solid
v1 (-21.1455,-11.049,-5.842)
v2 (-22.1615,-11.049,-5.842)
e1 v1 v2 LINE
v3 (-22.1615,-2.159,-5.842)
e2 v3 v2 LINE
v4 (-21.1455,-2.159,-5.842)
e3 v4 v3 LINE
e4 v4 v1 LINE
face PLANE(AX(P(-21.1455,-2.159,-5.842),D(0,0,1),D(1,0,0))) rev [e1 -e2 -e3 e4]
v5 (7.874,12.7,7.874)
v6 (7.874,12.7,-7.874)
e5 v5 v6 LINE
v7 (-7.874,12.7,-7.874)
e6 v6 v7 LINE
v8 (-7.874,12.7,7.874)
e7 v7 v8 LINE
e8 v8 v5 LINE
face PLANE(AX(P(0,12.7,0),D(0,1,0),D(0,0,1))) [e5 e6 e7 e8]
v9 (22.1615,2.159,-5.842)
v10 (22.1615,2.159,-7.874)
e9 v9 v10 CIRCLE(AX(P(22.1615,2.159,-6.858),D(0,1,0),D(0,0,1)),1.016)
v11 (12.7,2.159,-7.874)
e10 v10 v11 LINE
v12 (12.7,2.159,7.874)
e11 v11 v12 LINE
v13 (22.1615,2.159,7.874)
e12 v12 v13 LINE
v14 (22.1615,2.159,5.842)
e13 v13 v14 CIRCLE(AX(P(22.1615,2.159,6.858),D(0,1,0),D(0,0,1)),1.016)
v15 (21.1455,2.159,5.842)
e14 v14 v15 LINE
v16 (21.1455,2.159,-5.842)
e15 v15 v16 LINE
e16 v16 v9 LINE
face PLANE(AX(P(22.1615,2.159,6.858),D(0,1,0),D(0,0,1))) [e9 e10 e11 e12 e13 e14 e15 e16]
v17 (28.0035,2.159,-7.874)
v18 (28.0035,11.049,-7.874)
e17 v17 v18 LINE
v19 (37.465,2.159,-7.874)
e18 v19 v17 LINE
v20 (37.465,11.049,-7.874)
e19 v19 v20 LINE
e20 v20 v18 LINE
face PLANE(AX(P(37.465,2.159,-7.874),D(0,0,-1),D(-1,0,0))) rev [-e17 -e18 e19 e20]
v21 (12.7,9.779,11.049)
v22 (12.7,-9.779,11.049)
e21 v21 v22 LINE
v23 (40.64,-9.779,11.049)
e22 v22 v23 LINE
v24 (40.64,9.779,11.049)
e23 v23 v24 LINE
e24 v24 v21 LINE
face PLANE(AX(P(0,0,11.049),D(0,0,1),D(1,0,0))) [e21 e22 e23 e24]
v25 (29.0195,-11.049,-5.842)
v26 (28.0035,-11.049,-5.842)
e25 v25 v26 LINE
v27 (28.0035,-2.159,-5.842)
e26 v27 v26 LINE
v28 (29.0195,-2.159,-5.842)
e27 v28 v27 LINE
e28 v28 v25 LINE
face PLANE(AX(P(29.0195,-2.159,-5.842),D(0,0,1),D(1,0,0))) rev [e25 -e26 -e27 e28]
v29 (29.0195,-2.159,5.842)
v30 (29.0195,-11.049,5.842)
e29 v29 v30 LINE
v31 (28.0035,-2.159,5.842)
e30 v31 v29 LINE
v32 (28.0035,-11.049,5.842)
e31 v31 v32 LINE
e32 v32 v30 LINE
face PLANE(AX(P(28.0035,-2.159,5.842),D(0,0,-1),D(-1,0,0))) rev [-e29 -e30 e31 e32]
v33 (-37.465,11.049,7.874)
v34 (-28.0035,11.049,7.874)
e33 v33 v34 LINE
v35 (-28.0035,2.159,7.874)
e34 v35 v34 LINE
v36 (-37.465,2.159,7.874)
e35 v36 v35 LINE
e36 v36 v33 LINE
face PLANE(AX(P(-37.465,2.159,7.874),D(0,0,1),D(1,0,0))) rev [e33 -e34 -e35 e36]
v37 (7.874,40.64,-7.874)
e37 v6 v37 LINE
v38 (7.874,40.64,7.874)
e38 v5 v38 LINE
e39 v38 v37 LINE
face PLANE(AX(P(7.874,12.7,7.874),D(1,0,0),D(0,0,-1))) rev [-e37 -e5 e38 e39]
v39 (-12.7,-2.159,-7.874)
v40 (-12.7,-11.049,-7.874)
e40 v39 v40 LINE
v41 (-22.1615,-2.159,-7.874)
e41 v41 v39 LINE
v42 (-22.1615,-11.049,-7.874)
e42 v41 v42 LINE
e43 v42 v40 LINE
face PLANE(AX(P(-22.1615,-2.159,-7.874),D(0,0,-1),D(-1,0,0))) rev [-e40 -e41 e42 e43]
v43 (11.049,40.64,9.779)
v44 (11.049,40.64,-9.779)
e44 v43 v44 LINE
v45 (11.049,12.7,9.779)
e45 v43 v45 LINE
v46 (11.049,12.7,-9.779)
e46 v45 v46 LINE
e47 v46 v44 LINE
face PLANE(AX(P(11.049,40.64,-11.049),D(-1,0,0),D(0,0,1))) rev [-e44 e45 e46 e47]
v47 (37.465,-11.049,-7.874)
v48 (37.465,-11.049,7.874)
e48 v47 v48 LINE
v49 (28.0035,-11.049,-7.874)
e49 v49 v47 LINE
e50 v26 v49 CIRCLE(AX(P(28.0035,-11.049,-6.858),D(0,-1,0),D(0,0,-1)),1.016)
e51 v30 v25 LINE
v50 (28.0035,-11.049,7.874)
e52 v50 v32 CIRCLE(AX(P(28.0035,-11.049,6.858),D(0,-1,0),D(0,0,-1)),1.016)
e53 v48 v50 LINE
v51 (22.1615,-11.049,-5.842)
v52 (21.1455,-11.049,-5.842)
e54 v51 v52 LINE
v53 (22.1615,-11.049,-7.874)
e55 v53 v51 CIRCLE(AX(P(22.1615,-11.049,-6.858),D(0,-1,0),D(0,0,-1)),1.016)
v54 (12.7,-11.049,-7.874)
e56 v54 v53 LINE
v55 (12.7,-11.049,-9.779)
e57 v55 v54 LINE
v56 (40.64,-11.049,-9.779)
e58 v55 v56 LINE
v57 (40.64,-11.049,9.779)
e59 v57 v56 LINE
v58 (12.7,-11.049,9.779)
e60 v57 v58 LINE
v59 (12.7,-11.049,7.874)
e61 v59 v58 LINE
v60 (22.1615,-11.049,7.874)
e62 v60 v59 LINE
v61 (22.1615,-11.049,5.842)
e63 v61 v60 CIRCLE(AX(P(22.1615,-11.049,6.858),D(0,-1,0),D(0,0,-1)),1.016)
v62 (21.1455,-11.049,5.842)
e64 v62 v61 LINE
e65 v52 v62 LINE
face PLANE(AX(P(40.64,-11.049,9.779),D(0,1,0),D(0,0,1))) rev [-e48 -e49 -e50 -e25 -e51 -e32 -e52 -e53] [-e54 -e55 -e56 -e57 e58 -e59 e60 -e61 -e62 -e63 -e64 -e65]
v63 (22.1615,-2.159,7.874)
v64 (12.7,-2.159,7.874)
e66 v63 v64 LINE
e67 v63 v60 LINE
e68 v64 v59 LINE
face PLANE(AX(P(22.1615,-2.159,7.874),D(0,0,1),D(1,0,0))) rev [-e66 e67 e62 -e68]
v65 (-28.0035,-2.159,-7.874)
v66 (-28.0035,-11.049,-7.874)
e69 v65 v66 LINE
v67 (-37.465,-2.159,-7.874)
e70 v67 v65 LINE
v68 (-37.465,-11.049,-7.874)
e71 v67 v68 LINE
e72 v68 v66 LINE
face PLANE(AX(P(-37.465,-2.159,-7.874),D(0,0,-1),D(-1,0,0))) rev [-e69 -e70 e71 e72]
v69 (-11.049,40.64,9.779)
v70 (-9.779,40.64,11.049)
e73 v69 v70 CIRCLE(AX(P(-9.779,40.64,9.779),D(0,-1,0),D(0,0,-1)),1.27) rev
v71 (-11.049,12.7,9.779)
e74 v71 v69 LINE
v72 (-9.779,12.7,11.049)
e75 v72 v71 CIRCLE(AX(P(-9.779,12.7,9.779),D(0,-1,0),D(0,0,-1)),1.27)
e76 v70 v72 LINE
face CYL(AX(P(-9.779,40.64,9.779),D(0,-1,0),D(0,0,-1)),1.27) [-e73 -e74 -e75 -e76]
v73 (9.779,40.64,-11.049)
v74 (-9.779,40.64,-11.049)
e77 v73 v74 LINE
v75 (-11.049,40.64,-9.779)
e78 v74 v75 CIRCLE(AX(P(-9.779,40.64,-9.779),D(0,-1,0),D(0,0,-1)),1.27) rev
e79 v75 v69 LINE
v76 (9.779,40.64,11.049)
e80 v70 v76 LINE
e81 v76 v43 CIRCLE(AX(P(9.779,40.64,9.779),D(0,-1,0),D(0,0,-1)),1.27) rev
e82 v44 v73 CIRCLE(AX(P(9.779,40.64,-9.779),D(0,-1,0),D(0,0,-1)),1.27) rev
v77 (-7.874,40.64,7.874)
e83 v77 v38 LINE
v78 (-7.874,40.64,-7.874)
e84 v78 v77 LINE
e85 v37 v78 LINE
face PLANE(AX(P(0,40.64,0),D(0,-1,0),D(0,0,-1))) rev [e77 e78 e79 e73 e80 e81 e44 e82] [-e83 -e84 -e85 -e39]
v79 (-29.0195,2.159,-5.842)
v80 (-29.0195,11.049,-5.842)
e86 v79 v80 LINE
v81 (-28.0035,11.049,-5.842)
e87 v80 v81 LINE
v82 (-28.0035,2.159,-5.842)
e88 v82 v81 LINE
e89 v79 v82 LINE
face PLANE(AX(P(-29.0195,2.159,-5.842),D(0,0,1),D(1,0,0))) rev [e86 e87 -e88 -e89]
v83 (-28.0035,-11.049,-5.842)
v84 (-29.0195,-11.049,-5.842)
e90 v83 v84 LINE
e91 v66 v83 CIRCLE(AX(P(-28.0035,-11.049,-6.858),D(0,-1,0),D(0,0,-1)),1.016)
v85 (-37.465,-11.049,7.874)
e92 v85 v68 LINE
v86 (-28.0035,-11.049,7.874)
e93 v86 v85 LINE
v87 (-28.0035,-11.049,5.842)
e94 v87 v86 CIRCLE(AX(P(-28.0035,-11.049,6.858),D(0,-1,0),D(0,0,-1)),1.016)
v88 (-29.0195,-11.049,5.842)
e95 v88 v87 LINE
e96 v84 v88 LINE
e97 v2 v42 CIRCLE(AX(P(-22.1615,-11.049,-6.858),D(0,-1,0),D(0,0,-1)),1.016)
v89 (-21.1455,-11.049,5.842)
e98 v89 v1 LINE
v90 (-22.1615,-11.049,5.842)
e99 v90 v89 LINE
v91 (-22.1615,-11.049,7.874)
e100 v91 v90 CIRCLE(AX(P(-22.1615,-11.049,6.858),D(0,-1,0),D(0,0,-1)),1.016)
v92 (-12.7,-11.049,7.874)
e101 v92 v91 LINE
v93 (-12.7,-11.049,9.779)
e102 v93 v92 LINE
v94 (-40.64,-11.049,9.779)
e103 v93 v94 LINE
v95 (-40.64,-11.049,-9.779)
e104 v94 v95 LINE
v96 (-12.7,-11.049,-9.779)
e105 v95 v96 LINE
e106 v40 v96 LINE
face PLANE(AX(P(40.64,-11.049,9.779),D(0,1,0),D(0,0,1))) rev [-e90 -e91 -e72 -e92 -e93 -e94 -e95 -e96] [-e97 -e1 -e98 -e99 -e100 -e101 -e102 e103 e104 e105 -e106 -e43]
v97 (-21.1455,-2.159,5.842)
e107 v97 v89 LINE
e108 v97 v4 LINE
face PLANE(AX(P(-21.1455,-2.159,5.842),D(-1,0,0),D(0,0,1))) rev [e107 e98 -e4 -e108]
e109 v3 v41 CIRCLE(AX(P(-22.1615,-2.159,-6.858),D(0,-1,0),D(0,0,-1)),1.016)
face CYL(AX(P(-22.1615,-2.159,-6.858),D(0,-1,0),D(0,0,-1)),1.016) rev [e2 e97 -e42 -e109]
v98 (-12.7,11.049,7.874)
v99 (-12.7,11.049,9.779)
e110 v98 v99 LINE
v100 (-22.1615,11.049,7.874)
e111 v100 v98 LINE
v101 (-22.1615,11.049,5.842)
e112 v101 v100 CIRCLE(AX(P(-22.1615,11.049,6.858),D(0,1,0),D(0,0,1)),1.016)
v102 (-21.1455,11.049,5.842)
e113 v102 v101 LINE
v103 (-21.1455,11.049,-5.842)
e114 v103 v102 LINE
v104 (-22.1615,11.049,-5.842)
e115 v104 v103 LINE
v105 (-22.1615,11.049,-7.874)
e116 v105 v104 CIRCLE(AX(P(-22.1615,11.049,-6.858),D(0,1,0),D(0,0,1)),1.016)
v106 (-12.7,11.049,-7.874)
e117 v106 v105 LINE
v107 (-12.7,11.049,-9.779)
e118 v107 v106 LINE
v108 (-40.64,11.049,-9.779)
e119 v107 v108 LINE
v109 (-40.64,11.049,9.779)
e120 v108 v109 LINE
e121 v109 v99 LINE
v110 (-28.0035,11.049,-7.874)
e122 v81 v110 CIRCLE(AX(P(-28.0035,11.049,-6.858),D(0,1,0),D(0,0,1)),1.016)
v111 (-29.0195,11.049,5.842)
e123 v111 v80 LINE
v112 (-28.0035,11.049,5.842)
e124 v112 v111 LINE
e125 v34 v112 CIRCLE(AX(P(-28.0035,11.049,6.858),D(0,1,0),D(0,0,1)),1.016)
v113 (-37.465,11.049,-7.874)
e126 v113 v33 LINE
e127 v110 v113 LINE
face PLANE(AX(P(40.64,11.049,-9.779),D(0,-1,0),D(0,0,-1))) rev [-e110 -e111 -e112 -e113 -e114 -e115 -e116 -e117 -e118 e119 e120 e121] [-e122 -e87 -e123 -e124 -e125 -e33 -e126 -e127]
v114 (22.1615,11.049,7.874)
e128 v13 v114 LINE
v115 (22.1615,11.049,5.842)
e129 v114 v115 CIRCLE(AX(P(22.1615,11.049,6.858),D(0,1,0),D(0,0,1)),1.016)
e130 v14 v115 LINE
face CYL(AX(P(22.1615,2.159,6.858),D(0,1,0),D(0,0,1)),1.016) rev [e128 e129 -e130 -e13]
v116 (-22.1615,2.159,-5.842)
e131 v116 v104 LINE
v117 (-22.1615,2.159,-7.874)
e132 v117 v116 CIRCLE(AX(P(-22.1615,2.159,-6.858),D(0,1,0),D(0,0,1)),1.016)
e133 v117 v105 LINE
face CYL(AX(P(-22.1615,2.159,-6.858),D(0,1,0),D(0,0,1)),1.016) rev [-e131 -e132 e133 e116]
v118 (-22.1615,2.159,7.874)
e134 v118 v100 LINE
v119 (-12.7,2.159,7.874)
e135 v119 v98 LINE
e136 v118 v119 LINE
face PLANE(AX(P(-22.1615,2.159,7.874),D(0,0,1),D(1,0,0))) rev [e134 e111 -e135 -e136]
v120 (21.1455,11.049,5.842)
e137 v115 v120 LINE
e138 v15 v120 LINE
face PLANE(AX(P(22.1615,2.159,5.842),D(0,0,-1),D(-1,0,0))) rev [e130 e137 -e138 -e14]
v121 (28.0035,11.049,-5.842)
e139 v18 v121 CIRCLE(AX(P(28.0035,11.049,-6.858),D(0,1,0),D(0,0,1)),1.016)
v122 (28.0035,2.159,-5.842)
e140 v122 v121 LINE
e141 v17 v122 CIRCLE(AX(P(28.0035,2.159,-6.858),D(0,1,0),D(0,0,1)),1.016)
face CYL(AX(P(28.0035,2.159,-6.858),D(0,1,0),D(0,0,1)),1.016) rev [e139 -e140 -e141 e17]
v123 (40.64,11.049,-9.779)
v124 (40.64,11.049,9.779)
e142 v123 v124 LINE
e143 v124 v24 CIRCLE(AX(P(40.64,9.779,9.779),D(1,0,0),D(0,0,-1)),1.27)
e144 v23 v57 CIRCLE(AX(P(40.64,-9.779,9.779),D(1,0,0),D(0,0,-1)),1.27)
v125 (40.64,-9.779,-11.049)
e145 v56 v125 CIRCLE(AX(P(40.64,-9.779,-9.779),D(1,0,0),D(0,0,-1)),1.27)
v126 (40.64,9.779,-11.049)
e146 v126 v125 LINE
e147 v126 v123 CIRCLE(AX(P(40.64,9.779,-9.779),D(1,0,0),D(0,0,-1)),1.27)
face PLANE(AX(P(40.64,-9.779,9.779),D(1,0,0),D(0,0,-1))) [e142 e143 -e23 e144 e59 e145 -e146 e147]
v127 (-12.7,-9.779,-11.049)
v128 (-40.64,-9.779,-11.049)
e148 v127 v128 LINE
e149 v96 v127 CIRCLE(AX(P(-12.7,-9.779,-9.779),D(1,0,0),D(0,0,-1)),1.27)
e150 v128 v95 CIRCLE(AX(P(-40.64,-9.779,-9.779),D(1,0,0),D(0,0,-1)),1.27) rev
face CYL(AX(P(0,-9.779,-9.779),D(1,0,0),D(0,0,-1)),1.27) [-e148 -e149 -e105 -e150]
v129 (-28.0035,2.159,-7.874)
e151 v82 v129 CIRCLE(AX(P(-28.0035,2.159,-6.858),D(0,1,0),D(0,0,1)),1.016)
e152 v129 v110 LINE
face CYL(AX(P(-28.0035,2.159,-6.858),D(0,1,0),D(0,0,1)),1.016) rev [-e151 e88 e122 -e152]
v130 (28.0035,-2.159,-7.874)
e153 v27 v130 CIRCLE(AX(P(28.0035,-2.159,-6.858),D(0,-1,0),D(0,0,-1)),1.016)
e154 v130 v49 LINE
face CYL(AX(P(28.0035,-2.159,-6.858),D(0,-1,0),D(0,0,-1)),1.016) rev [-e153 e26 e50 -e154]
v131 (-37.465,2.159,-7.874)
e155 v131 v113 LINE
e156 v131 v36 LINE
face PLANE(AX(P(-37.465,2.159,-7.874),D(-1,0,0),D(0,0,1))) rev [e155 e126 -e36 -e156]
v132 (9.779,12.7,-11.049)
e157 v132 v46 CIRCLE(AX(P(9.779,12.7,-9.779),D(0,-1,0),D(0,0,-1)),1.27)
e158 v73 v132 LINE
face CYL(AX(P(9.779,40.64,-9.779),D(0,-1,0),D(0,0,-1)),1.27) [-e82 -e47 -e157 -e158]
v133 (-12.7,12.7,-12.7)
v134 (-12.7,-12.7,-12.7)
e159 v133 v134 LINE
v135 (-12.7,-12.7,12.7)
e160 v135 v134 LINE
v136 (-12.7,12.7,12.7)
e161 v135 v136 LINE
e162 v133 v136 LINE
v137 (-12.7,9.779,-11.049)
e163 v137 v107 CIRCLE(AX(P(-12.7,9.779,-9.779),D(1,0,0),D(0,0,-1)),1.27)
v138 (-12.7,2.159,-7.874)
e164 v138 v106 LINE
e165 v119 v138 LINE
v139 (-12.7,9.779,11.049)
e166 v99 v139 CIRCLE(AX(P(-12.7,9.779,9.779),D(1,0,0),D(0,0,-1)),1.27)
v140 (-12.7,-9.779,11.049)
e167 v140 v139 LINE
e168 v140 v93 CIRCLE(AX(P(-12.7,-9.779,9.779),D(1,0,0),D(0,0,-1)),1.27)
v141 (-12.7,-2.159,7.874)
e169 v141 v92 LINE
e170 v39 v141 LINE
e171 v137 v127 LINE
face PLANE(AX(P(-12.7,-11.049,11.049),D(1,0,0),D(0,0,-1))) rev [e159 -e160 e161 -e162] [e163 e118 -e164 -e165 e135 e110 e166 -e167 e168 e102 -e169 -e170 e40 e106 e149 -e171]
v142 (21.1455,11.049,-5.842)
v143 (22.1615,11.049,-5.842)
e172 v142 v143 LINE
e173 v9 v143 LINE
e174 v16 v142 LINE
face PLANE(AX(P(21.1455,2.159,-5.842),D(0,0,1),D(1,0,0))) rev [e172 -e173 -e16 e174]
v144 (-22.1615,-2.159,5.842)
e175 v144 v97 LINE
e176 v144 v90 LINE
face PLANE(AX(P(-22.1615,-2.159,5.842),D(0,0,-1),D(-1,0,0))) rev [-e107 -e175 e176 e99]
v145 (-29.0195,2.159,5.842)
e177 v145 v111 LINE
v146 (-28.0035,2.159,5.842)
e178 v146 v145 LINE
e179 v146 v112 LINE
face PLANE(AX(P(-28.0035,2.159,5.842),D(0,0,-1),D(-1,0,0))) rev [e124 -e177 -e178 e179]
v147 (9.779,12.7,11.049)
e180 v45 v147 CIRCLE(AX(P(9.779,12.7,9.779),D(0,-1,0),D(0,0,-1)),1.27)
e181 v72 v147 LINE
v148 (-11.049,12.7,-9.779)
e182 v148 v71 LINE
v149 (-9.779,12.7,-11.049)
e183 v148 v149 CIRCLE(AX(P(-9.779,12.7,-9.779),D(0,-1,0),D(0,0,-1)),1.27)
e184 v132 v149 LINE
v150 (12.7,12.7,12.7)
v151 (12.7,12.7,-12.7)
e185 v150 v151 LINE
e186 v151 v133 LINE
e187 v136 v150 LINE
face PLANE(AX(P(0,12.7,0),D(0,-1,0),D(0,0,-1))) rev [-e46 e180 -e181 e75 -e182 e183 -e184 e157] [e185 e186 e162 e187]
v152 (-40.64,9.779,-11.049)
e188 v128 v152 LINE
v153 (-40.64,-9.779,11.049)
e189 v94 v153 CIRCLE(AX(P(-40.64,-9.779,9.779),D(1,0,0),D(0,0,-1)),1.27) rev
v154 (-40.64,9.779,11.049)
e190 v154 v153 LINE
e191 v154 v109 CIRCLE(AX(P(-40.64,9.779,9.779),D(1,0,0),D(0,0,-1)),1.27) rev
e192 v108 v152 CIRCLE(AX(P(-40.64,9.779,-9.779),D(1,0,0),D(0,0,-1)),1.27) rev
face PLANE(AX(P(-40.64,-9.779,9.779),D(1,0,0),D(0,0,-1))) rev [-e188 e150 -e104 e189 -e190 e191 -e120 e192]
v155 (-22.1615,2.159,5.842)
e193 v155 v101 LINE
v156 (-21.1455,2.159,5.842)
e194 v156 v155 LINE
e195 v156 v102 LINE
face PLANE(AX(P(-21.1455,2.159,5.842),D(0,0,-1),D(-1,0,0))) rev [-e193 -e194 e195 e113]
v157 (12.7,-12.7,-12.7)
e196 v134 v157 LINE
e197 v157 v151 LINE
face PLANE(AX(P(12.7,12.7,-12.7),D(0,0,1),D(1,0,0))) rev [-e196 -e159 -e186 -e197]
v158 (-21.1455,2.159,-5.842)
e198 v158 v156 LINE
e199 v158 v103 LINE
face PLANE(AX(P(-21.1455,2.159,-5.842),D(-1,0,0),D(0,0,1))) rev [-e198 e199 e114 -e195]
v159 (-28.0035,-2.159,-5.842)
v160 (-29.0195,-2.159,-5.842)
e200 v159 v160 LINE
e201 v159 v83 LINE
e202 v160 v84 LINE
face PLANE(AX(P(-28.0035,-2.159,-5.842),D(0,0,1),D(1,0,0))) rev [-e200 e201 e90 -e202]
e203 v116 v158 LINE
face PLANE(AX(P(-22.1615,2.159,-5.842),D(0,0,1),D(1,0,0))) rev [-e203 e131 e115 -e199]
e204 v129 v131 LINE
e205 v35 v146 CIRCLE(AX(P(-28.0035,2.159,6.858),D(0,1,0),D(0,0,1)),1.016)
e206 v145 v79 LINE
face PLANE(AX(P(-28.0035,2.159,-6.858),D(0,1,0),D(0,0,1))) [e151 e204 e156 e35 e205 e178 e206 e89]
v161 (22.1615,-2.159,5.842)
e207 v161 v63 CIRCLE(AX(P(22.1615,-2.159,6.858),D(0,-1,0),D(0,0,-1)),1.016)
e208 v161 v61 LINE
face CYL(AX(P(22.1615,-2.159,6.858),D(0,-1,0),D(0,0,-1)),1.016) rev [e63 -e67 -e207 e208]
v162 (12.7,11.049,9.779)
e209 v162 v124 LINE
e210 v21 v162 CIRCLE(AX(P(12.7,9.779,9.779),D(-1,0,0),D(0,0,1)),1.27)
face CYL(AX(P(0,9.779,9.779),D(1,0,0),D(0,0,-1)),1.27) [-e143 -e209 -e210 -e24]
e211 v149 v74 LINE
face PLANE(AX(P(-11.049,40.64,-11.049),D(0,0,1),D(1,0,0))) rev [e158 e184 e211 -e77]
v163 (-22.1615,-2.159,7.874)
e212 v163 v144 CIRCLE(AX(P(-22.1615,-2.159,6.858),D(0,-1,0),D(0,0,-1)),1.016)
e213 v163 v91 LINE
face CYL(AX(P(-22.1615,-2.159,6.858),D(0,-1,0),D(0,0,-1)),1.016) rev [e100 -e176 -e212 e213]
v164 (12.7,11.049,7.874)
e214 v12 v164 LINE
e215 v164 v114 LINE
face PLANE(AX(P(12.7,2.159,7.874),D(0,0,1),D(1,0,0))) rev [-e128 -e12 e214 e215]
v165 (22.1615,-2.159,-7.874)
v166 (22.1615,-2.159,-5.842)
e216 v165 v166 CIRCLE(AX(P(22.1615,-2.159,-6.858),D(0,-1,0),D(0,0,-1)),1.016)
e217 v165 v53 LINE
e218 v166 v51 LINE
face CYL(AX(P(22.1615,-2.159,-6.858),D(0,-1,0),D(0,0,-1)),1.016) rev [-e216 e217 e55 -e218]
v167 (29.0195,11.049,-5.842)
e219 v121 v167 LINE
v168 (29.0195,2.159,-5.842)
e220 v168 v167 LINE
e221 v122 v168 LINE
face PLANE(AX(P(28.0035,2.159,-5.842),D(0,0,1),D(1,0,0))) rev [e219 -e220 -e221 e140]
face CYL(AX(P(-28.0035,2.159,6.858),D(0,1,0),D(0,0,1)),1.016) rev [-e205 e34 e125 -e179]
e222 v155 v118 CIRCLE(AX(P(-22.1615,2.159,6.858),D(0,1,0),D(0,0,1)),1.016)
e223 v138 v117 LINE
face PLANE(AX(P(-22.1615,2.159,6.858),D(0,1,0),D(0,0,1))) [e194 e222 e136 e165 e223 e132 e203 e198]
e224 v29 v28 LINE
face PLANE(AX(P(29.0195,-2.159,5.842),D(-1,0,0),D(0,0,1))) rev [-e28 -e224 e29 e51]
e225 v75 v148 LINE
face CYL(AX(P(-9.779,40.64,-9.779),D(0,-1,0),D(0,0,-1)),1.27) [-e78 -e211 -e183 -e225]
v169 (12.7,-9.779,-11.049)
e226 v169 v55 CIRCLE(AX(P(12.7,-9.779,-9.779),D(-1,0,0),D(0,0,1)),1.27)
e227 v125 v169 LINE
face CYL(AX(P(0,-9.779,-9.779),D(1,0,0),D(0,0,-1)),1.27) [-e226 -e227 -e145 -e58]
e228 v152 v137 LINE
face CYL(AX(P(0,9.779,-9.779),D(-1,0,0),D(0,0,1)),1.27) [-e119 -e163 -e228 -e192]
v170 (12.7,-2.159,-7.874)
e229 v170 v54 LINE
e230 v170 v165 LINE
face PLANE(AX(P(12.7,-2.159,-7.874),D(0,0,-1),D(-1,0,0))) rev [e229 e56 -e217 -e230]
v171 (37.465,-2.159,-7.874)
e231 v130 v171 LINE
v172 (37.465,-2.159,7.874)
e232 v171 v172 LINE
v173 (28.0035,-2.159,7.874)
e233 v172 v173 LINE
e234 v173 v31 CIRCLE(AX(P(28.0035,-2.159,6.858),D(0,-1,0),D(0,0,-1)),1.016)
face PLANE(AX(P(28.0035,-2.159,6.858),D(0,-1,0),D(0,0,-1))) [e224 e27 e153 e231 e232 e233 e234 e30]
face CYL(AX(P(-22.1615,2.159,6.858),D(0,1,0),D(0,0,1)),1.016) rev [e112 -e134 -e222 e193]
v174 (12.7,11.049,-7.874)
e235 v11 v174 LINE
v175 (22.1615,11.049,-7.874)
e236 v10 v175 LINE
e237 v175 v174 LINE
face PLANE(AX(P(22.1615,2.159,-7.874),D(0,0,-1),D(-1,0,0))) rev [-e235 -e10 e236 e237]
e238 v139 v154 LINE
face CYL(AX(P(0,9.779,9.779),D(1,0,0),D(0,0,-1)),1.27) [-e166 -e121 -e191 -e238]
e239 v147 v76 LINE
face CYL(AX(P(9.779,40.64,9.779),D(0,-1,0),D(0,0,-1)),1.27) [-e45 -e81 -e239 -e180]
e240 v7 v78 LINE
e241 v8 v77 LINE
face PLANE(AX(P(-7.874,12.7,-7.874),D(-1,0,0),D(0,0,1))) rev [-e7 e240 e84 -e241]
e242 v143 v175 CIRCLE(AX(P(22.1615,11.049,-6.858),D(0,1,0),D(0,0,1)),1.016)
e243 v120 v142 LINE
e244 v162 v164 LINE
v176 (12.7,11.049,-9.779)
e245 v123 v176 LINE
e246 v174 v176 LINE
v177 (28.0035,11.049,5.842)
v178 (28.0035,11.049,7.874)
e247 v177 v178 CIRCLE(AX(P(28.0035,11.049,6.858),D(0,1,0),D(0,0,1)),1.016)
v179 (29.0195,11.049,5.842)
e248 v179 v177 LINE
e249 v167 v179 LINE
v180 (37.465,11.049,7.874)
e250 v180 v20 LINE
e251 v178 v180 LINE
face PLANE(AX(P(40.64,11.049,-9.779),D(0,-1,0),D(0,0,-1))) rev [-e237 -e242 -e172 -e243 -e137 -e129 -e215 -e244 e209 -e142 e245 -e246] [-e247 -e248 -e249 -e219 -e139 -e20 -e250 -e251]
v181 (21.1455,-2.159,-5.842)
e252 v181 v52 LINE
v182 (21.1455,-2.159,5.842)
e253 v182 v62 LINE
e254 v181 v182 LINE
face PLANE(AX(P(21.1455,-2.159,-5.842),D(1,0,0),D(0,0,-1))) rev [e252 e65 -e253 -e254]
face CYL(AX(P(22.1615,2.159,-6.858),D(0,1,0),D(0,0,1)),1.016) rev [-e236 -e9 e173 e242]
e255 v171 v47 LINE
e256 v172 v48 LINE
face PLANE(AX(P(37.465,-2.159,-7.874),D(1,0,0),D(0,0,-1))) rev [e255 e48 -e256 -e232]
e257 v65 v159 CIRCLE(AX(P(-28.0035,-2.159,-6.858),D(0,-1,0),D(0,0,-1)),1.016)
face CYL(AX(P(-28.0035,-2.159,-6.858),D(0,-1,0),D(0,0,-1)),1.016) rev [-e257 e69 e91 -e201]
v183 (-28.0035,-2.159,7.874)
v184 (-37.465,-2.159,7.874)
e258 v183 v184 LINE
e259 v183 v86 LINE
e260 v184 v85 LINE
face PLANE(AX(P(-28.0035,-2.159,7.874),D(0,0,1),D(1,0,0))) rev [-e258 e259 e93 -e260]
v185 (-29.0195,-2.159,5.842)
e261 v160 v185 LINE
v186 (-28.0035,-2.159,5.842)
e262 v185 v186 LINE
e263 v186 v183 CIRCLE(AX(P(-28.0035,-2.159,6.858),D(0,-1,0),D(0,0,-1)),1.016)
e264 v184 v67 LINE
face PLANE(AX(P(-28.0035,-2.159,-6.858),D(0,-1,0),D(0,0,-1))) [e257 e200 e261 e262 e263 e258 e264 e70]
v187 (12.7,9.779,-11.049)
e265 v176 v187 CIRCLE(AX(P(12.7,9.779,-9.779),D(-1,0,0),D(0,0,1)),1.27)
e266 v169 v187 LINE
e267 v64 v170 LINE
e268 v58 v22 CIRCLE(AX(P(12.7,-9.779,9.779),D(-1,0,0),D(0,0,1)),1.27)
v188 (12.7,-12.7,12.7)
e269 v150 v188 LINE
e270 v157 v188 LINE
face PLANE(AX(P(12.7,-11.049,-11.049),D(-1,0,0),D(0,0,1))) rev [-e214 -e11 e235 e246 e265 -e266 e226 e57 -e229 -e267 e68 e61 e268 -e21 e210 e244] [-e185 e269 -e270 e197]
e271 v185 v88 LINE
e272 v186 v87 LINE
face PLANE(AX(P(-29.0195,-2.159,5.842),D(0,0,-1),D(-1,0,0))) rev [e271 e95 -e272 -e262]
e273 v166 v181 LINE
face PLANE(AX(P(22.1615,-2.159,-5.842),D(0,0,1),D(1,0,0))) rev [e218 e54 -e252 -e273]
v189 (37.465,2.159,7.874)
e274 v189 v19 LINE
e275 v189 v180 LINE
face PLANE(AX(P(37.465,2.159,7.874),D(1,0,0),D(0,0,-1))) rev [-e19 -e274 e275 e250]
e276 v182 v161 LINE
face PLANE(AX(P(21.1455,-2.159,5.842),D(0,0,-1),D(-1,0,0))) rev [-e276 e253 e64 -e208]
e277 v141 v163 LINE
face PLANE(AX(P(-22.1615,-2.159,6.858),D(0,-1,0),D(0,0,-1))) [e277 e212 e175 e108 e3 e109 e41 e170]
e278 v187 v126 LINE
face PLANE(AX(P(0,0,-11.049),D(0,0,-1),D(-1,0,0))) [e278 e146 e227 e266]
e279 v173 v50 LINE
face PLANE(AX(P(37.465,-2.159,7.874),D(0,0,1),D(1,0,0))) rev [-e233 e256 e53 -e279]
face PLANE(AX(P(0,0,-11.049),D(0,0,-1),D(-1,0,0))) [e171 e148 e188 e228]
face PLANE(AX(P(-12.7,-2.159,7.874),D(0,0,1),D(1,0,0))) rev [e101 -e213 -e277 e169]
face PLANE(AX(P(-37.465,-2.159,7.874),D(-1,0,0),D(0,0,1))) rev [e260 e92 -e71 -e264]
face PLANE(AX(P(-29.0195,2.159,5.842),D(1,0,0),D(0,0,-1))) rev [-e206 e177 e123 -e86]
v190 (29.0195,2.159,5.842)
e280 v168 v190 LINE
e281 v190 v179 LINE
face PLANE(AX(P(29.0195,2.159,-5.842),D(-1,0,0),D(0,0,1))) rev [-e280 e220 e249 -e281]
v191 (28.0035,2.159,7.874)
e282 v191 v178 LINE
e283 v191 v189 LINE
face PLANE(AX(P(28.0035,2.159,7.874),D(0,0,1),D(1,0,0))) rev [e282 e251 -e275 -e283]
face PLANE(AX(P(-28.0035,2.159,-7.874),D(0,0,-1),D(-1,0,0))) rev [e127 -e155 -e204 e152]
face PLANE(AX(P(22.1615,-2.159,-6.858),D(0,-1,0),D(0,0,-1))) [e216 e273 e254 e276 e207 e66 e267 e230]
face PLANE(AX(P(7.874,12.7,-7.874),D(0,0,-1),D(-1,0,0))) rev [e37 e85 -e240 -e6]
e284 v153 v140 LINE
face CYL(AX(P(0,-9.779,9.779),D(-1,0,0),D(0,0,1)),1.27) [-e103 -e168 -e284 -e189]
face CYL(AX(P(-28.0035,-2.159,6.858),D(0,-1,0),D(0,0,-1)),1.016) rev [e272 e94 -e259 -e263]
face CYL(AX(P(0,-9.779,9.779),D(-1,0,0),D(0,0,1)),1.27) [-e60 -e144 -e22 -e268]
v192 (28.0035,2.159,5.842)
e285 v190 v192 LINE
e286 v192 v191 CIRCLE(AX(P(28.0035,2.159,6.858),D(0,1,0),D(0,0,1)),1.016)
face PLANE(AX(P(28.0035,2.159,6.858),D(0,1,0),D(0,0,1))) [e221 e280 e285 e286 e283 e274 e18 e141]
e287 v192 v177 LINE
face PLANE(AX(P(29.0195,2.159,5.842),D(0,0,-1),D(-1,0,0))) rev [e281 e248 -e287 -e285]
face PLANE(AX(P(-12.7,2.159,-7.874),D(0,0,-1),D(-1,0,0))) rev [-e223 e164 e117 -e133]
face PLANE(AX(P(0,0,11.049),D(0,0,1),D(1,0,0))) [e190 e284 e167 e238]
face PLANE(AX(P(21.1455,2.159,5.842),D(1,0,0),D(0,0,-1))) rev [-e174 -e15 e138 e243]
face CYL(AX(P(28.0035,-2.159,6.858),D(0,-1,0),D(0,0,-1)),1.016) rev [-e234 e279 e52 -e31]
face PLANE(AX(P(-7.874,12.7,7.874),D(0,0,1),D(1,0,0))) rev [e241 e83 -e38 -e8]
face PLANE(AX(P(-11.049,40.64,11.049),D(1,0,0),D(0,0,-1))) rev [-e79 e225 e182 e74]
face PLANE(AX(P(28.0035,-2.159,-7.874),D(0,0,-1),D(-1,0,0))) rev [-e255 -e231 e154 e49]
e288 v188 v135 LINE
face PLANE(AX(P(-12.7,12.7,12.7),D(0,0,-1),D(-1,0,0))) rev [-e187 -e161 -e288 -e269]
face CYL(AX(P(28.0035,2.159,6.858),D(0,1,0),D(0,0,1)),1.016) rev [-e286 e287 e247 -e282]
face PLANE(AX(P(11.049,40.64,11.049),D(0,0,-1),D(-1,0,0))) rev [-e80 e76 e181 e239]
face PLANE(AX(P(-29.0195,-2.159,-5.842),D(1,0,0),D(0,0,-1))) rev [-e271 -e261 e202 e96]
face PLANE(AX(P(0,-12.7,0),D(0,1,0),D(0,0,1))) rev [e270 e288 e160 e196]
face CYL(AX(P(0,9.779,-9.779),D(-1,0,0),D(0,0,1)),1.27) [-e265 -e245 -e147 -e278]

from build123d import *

# Parameters (mm, degrees)
CUT_EXTRUDE1_START       = -25.4
CUT_EXTRUDE1_OUTLINE_W   = 81.28
CUT_EXTRUDE1_OUTLINE_H   = 22.098
CUT_EXTRUDE1_DEPTH       = 23.749
CUT_EXTRUDE1_START_2     = -1.651
CUT_EXTRUDE1_2_OUTLINE_W = 53.34
CUT_EXTRUDE1_2_OUTLINE_H = 22.098
CUT_EXTRUDE1_2_DEPTH     = 1.651
SKETCH2_W                = 27.94
SKETCH2_H                = 22.098
CUT_EXTRUDE2_DEPTH       = 1.651
SKETCH3_W                = 27.94
SKETCH3_H                = 22.098
CUT_EXTRUDE3_DEPTH       = 1.651
SKETCH4_W                = 27.94
SKETCH4_H                = 22.098
CUT_EXTRUDE4_DEPTH       = 1.651
SKETCH5_W                = 25.4
SKETCH5_H                = 25.4
BOSS_EXTRUDE1_DEPTH      = 1.651
SKETCH6_W                = 25.4
SKETCH6_H                = 25.4
BOSS_EXTRUDE2_DEPTH      = 1.651
CUT_EXTRUDE5_DEPTH       = 8.89
CUT_EXTRUDE6_DEPTH       = 8.89
CUT_EXTRUDE7_START       = -8.89
CUT_EXTRUDE7_DEPTH       = 8.89
CUT_EXTRUDE8_START       = -8.89
CUT_EXTRUDE8_DEPTH       = 8.89
CUT_EXTRUDE9_DEPTH       = 8.89
CUT_EXTRUDE10_START      = -8.89
CUT_EXTRUDE10_DEPTH      = 8.89
CUT_EXTRUDE11_DEPTH      = 8.89
CUT_EXTRUDE12_START      = -8.89
CUT_EXTRUDE12_DEPTH      = 8.89
SKETCH15_W               = 22.098
SKETCH15_H               = 22.098
BOSS_EXTRUDE3_DEPTH      = 27.94
SKETCH16_W               = 15.748
SKETCH16_H               = 15.748
CUT_EXTRUDE13_DEPTH      = 27.94
FILLET1_R                = 1.27


with BuildPart() as part:
    # Cut-Extrude1: read off the stored shape, not the designer's step
    # Cut-Extrude1 outline → Cut-Extrude1 (new body)
    with BuildSketch(Plane.XY.offset(12.7).offset(CUT_EXTRUDE1_START)):
        Rectangle(CUT_EXTRUDE1_OUTLINE_W, CUT_EXTRUDE1_OUTLINE_H)
    extrude(amount=CUT_EXTRUDE1_DEPTH)

    # Cut-Extrude1 2 outline → Cut-Extrude1 2 (add)
    with BuildSketch(Plane.XY.offset(12.7).offset(CUT_EXTRUDE1_START_2)):
        with Locations((13.97, 0)):
            Rectangle(CUT_EXTRUDE1_2_OUTLINE_W, CUT_EXTRUDE1_2_OUTLINE_H)
    extrude(amount=CUT_EXTRUDE1_2_DEPTH)

    # Sketch2 → Cut-Extrude2 (cut)
    with BuildSketch(Plane(origin=(0, 0, -12.7), x_dir=(-1, 0, 0), z_dir=(0, 0, -1))):
        with Locations((26.67, 0)):
            Rectangle(SKETCH2_W, SKETCH2_H)
    extrude(amount=-CUT_EXTRUDE2_DEPTH, mode=Mode.SUBTRACT)

    # Sketch3 → Cut-Extrude3 (cut)
    with BuildSketch(Plane(origin=(0, 0, -12.7), x_dir=(-1, 0, 0), z_dir=(0, 0, -1))):
        with Locations((-26.67, 0)):
            Rectangle(SKETCH3_W, SKETCH3_H)
    extrude(amount=-CUT_EXTRUDE3_DEPTH, mode=Mode.SUBTRACT)

    # Sketch4 → Cut-Extrude4 (cut)
    with BuildSketch(Plane.XY.offset(12.7)):
        with Locations((26.67, 0)):
            Rectangle(SKETCH4_W, SKETCH4_H)
    extrude(amount=-CUT_EXTRUDE4_DEPTH, mode=Mode.SUBTRACT)

    # Sketch5 → Boss-Extrude1 (add)
    with BuildSketch(Plane(origin=(0, 11.049, 0), x_dir=(-1, 0, 0), z_dir=(0, 1, 0))):
        Rectangle(SKETCH5_W, SKETCH5_H)
    extrude(amount=BOSS_EXTRUDE1_DEPTH)

    # Sketch6 → Boss-Extrude2 (add)
    with BuildSketch(Plane.XZ.offset(11.049)):
        Rectangle(SKETCH6_W, SKETCH6_H)
    extrude(amount=BOSS_EXTRUDE2_DEPTH)

    # Sketch7 → Cut-Extrude5 (cut)
    with BuildSketch(Plane(origin=(0, 11.049, 0), x_dir=(-1, 0, 0), z_dir=(0, 1, 0))):
        with BuildLine():
            Line((-12.7, -7.874), (-12.7, 7.874))
            Line((-12.7, 7.874), (-22.1615, 7.874))
            ThreePointArc((-22.1615, 7.874), (-23.1775, 6.858), (-22.1615, 5.842))
            Line((-22.1615, 5.842), (-21.1455, 5.842))
            Line((-21.1455, 5.842), (-21.1455, -5.842))
            Line((-21.1455, -5.842), (-22.1615, -5.842))
            ThreePointArc((-22.1615, -5.842), (-23.1775, -6.858), (-22.1615, -7.874))
            Line((-22.1615, -7.874), (-12.7, -7.874))
        make_face()
    extrude(amount=-CUT_EXTRUDE5_DEPTH, mode=Mode.SUBTRACT)

    # Sketch8 → Cut-Extrude6 (cut)
    with BuildSketch(Plane.XZ.offset(11.049)):
        with BuildLine():
            Line((-22.1615, 5.842), (-21.1455, 5.842))
            Line((-21.1455, 5.842), (-21.1455, -5.842))
            Line((-21.1455, -5.842), (-22.1615, -5.842))
            ThreePointArc((-22.1615, -5.842), (-23.1775, -6.858), (-22.1615, -7.874))
            Line((-22.1615, -7.874), (-12.7, -7.874))
            Line((-12.7, -7.874), (-12.7, 7.874))
            Line((-12.7, 7.874), (-22.1615, 7.874))
            ThreePointArc((-22.1615, 7.874), (-23.1775, 6.858), (-22.1615, 5.842))
        make_face()
    extrude(amount=-CUT_EXTRUDE6_DEPTH, mode=Mode.SUBTRACT)

    # Sketch9 → Cut-Extrude7 (cut)
    with BuildSketch(Plane.XZ.offset(11.049).offset(CUT_EXTRUDE7_START)):
        with BuildLine():
            Line((12.7, 7.874), (12.7, -7.874))
            Line((12.7, -7.874), (22.1615, -7.874))
            ThreePointArc((22.1615, -7.874), (23.1775, -6.858), (22.1615, -5.842))
            Line((22.1615, -5.842), (21.1455, -5.842))
            Line((21.1455, -5.842), (21.1455, 5.842))
            Line((21.1455, 5.842), (22.1615, 5.842))
            ThreePointArc((22.1615, 5.842), (23.1775, 6.858), (22.1615, 7.874))
            Line((22.1615, 7.874), (12.7, 7.874))
        make_face()
    extrude(amount=CUT_EXTRUDE7_DEPTH, mode=Mode.SUBTRACT)

    # Sketch10 → Cut-Extrude8 (cut)
    with BuildSketch(Plane(origin=(0, 11.049, 0), x_dir=(-1, 0, 0), z_dir=(0, 1, 0)).offset(CUT_EXTRUDE8_START)):
        with BuildLine():
            Line((21.1455, 5.842), (22.1615, 5.842))
            ThreePointArc((22.1615, 5.842), (23.1775, 6.858), (22.1615, 7.874))
            Line((22.1615, 7.874), (12.7, 7.874))
            Line((12.7, 7.874), (12.7, -7.874))
            Line((12.7, -7.874), (22.1615, -7.874))
            ThreePointArc((22.1615, -7.874), (23.1775, -6.858), (22.1615, -5.842))
            Line((22.1615, -5.842), (21.1455, -5.842))
            Line((21.1455, -5.842), (21.1455, 5.842))
        make_face()
    extrude(amount=CUT_EXTRUDE8_DEPTH, mode=Mode.SUBTRACT)

    # Sketch11 → Cut-Extrude9 (cut)
    with BuildSketch(Plane.XZ.offset(11.049)):
        with BuildLine():
            Line((28.0035, 5.842), (29.0195, 5.842))
            Line((29.0195, 5.842), (29.0195, -5.842))
            Line((29.0195, -5.842), (28.0035, -5.842))
            ThreePointArc((28.0035, -5.842), (26.9875, -6.858), (28.0035, -7.874))
            Line((28.0035, -7.874), (37.465, -7.874))
            Line((37.465, -7.874), (37.465, 7.874))
            Line((37.465, 7.874), (28.0035, 7.874))
            ThreePointArc((28.0035, 7.874), (26.9875, 6.858), (28.0035, 5.842))
        make_face()
    extrude(amount=-CUT_EXTRUDE9_DEPTH, mode=Mode.SUBTRACT)

    # Sketch12 → Cut-Extrude10 (cut)
    with BuildSketch(Plane(origin=(0, 11.049, 0), x_dir=(-1, 0, 0), z_dir=(0, 1, 0)).offset(CUT_EXTRUDE10_START)):
        with BuildLine():
            Line((-29.0195, -5.842), (-29.0195, 5.842))
            Line((-29.0195, 5.842), (-28.0035, 5.842))
            ThreePointArc((-28.0035, 5.842), (-26.9875, 6.858), (-28.0035, 7.874))
            Line((-28.0035, 7.874), (-37.465, 7.874))
            Line((-37.465, 7.874), (-37.465, -7.874))
            Line((-37.465, -7.874), (-28.0035, -7.874))
            ThreePointArc((-28.0035, -7.874), (-26.9875, -6.858), (-28.0035, -5.842))
            Line((-28.0035, -5.842), (-29.0195, -5.842))
        make_face()
    extrude(amount=CUT_EXTRUDE10_DEPTH, mode=Mode.SUBTRACT)

    # Sketch13 → Cut-Extrude11 (cut)
    with BuildSketch(Plane(origin=(0, 11.049, 0), x_dir=(-1, 0, 0), z_dir=(0, 1, 0))):
        with BuildLine():
            Line((28.0035, -7.874), (37.465, -7.874))
            Line((37.465, -7.874), (37.465, 7.874))
            Line((37.465, 7.874), (28.0035, 7.874))
            ThreePointArc((28.0035, 7.874), (26.9875, 6.858), (28.0035, 5.842))
            Line((28.0035, 5.842), (29.0195, 5.842))
            Line((29.0195, 5.842), (29.0195, -5.842))
            Line((29.0195, -5.842), (28.0035, -5.842))
            ThreePointArc((28.0035, -5.842), (26.9875, -6.858), (28.0035, -7.874))
        make_face()
    extrude(amount=-CUT_EXTRUDE11_DEPTH, mode=Mode.SUBTRACT)

    # Sketch14 → Cut-Extrude12 (cut)
    with BuildSketch(Plane.XZ.offset(11.049).offset(CUT_EXTRUDE12_START)):
        with BuildLine():
            Line((-37.465, 7.874), (-37.465, -7.874))
            Line((-37.465, -7.874), (-28.0035, -7.874))
            ThreePointArc((-28.0035, -7.874), (-26.9875, -6.858), (-28.0035, -5.842))
            Line((-28.0035, -5.842), (-29.0195, -5.842))
            Line((-29.0195, -5.842), (-29.0195, 5.842))
            Line((-29.0195, 5.842), (-28.0035, 5.842))
            ThreePointArc((-28.0035, 5.842), (-26.9875, 6.858), (-28.0035, 7.874))
            Line((-28.0035, 7.874), (-37.465, 7.874))
        make_face()
    extrude(amount=CUT_EXTRUDE12_DEPTH, mode=Mode.SUBTRACT)

    # Sketch15 → Boss-Extrude3 (add)
    with BuildSketch(Plane(origin=(0, 12.7, 0), x_dir=(-1, 0, 0), z_dir=(0, 1, 0))):
        Rectangle(SKETCH15_W, SKETCH15_H)
    extrude(amount=BOSS_EXTRUDE3_DEPTH)

    # Sketch16 → Cut-Extrude13 (cut)
    with BuildSketch(Plane(origin=(0, 40.64, 0), x_dir=(-1, 0, 0), z_dir=(0, 1, 0))):
        Rectangle(SKETCH16_W, SKETCH16_H)
    extrude(amount=-CUT_EXTRUDE13_DEPTH, mode=Mode.SUBTRACT)

    # Fillet1
    fillet1_edges = [part.edges().sort_by_distance(p)[0] for p in [
        (11.049, 26.67, 11.049),
        (-26.67, 11.049, 11.049),
        (-26.67, -11.049, -11.049),
        (26.67, 11.049, 11.049),
        (11.049, 26.67, -11.049),
        (26.67, 11.049, -11.049),
        (-26.67, -11.049, 11.049),
        (26.67, -11.049, 11.049),
        (-26.67, 11.049, -11.049),
        (-11.049, 26.67, 11.049),
        (26.67, -11.049, -11.049),
        (-11.049, 26.67, -11.049),
    ]]
    fillet(fillet1_edges, radius=FILLET1_R)


solid = part.part
